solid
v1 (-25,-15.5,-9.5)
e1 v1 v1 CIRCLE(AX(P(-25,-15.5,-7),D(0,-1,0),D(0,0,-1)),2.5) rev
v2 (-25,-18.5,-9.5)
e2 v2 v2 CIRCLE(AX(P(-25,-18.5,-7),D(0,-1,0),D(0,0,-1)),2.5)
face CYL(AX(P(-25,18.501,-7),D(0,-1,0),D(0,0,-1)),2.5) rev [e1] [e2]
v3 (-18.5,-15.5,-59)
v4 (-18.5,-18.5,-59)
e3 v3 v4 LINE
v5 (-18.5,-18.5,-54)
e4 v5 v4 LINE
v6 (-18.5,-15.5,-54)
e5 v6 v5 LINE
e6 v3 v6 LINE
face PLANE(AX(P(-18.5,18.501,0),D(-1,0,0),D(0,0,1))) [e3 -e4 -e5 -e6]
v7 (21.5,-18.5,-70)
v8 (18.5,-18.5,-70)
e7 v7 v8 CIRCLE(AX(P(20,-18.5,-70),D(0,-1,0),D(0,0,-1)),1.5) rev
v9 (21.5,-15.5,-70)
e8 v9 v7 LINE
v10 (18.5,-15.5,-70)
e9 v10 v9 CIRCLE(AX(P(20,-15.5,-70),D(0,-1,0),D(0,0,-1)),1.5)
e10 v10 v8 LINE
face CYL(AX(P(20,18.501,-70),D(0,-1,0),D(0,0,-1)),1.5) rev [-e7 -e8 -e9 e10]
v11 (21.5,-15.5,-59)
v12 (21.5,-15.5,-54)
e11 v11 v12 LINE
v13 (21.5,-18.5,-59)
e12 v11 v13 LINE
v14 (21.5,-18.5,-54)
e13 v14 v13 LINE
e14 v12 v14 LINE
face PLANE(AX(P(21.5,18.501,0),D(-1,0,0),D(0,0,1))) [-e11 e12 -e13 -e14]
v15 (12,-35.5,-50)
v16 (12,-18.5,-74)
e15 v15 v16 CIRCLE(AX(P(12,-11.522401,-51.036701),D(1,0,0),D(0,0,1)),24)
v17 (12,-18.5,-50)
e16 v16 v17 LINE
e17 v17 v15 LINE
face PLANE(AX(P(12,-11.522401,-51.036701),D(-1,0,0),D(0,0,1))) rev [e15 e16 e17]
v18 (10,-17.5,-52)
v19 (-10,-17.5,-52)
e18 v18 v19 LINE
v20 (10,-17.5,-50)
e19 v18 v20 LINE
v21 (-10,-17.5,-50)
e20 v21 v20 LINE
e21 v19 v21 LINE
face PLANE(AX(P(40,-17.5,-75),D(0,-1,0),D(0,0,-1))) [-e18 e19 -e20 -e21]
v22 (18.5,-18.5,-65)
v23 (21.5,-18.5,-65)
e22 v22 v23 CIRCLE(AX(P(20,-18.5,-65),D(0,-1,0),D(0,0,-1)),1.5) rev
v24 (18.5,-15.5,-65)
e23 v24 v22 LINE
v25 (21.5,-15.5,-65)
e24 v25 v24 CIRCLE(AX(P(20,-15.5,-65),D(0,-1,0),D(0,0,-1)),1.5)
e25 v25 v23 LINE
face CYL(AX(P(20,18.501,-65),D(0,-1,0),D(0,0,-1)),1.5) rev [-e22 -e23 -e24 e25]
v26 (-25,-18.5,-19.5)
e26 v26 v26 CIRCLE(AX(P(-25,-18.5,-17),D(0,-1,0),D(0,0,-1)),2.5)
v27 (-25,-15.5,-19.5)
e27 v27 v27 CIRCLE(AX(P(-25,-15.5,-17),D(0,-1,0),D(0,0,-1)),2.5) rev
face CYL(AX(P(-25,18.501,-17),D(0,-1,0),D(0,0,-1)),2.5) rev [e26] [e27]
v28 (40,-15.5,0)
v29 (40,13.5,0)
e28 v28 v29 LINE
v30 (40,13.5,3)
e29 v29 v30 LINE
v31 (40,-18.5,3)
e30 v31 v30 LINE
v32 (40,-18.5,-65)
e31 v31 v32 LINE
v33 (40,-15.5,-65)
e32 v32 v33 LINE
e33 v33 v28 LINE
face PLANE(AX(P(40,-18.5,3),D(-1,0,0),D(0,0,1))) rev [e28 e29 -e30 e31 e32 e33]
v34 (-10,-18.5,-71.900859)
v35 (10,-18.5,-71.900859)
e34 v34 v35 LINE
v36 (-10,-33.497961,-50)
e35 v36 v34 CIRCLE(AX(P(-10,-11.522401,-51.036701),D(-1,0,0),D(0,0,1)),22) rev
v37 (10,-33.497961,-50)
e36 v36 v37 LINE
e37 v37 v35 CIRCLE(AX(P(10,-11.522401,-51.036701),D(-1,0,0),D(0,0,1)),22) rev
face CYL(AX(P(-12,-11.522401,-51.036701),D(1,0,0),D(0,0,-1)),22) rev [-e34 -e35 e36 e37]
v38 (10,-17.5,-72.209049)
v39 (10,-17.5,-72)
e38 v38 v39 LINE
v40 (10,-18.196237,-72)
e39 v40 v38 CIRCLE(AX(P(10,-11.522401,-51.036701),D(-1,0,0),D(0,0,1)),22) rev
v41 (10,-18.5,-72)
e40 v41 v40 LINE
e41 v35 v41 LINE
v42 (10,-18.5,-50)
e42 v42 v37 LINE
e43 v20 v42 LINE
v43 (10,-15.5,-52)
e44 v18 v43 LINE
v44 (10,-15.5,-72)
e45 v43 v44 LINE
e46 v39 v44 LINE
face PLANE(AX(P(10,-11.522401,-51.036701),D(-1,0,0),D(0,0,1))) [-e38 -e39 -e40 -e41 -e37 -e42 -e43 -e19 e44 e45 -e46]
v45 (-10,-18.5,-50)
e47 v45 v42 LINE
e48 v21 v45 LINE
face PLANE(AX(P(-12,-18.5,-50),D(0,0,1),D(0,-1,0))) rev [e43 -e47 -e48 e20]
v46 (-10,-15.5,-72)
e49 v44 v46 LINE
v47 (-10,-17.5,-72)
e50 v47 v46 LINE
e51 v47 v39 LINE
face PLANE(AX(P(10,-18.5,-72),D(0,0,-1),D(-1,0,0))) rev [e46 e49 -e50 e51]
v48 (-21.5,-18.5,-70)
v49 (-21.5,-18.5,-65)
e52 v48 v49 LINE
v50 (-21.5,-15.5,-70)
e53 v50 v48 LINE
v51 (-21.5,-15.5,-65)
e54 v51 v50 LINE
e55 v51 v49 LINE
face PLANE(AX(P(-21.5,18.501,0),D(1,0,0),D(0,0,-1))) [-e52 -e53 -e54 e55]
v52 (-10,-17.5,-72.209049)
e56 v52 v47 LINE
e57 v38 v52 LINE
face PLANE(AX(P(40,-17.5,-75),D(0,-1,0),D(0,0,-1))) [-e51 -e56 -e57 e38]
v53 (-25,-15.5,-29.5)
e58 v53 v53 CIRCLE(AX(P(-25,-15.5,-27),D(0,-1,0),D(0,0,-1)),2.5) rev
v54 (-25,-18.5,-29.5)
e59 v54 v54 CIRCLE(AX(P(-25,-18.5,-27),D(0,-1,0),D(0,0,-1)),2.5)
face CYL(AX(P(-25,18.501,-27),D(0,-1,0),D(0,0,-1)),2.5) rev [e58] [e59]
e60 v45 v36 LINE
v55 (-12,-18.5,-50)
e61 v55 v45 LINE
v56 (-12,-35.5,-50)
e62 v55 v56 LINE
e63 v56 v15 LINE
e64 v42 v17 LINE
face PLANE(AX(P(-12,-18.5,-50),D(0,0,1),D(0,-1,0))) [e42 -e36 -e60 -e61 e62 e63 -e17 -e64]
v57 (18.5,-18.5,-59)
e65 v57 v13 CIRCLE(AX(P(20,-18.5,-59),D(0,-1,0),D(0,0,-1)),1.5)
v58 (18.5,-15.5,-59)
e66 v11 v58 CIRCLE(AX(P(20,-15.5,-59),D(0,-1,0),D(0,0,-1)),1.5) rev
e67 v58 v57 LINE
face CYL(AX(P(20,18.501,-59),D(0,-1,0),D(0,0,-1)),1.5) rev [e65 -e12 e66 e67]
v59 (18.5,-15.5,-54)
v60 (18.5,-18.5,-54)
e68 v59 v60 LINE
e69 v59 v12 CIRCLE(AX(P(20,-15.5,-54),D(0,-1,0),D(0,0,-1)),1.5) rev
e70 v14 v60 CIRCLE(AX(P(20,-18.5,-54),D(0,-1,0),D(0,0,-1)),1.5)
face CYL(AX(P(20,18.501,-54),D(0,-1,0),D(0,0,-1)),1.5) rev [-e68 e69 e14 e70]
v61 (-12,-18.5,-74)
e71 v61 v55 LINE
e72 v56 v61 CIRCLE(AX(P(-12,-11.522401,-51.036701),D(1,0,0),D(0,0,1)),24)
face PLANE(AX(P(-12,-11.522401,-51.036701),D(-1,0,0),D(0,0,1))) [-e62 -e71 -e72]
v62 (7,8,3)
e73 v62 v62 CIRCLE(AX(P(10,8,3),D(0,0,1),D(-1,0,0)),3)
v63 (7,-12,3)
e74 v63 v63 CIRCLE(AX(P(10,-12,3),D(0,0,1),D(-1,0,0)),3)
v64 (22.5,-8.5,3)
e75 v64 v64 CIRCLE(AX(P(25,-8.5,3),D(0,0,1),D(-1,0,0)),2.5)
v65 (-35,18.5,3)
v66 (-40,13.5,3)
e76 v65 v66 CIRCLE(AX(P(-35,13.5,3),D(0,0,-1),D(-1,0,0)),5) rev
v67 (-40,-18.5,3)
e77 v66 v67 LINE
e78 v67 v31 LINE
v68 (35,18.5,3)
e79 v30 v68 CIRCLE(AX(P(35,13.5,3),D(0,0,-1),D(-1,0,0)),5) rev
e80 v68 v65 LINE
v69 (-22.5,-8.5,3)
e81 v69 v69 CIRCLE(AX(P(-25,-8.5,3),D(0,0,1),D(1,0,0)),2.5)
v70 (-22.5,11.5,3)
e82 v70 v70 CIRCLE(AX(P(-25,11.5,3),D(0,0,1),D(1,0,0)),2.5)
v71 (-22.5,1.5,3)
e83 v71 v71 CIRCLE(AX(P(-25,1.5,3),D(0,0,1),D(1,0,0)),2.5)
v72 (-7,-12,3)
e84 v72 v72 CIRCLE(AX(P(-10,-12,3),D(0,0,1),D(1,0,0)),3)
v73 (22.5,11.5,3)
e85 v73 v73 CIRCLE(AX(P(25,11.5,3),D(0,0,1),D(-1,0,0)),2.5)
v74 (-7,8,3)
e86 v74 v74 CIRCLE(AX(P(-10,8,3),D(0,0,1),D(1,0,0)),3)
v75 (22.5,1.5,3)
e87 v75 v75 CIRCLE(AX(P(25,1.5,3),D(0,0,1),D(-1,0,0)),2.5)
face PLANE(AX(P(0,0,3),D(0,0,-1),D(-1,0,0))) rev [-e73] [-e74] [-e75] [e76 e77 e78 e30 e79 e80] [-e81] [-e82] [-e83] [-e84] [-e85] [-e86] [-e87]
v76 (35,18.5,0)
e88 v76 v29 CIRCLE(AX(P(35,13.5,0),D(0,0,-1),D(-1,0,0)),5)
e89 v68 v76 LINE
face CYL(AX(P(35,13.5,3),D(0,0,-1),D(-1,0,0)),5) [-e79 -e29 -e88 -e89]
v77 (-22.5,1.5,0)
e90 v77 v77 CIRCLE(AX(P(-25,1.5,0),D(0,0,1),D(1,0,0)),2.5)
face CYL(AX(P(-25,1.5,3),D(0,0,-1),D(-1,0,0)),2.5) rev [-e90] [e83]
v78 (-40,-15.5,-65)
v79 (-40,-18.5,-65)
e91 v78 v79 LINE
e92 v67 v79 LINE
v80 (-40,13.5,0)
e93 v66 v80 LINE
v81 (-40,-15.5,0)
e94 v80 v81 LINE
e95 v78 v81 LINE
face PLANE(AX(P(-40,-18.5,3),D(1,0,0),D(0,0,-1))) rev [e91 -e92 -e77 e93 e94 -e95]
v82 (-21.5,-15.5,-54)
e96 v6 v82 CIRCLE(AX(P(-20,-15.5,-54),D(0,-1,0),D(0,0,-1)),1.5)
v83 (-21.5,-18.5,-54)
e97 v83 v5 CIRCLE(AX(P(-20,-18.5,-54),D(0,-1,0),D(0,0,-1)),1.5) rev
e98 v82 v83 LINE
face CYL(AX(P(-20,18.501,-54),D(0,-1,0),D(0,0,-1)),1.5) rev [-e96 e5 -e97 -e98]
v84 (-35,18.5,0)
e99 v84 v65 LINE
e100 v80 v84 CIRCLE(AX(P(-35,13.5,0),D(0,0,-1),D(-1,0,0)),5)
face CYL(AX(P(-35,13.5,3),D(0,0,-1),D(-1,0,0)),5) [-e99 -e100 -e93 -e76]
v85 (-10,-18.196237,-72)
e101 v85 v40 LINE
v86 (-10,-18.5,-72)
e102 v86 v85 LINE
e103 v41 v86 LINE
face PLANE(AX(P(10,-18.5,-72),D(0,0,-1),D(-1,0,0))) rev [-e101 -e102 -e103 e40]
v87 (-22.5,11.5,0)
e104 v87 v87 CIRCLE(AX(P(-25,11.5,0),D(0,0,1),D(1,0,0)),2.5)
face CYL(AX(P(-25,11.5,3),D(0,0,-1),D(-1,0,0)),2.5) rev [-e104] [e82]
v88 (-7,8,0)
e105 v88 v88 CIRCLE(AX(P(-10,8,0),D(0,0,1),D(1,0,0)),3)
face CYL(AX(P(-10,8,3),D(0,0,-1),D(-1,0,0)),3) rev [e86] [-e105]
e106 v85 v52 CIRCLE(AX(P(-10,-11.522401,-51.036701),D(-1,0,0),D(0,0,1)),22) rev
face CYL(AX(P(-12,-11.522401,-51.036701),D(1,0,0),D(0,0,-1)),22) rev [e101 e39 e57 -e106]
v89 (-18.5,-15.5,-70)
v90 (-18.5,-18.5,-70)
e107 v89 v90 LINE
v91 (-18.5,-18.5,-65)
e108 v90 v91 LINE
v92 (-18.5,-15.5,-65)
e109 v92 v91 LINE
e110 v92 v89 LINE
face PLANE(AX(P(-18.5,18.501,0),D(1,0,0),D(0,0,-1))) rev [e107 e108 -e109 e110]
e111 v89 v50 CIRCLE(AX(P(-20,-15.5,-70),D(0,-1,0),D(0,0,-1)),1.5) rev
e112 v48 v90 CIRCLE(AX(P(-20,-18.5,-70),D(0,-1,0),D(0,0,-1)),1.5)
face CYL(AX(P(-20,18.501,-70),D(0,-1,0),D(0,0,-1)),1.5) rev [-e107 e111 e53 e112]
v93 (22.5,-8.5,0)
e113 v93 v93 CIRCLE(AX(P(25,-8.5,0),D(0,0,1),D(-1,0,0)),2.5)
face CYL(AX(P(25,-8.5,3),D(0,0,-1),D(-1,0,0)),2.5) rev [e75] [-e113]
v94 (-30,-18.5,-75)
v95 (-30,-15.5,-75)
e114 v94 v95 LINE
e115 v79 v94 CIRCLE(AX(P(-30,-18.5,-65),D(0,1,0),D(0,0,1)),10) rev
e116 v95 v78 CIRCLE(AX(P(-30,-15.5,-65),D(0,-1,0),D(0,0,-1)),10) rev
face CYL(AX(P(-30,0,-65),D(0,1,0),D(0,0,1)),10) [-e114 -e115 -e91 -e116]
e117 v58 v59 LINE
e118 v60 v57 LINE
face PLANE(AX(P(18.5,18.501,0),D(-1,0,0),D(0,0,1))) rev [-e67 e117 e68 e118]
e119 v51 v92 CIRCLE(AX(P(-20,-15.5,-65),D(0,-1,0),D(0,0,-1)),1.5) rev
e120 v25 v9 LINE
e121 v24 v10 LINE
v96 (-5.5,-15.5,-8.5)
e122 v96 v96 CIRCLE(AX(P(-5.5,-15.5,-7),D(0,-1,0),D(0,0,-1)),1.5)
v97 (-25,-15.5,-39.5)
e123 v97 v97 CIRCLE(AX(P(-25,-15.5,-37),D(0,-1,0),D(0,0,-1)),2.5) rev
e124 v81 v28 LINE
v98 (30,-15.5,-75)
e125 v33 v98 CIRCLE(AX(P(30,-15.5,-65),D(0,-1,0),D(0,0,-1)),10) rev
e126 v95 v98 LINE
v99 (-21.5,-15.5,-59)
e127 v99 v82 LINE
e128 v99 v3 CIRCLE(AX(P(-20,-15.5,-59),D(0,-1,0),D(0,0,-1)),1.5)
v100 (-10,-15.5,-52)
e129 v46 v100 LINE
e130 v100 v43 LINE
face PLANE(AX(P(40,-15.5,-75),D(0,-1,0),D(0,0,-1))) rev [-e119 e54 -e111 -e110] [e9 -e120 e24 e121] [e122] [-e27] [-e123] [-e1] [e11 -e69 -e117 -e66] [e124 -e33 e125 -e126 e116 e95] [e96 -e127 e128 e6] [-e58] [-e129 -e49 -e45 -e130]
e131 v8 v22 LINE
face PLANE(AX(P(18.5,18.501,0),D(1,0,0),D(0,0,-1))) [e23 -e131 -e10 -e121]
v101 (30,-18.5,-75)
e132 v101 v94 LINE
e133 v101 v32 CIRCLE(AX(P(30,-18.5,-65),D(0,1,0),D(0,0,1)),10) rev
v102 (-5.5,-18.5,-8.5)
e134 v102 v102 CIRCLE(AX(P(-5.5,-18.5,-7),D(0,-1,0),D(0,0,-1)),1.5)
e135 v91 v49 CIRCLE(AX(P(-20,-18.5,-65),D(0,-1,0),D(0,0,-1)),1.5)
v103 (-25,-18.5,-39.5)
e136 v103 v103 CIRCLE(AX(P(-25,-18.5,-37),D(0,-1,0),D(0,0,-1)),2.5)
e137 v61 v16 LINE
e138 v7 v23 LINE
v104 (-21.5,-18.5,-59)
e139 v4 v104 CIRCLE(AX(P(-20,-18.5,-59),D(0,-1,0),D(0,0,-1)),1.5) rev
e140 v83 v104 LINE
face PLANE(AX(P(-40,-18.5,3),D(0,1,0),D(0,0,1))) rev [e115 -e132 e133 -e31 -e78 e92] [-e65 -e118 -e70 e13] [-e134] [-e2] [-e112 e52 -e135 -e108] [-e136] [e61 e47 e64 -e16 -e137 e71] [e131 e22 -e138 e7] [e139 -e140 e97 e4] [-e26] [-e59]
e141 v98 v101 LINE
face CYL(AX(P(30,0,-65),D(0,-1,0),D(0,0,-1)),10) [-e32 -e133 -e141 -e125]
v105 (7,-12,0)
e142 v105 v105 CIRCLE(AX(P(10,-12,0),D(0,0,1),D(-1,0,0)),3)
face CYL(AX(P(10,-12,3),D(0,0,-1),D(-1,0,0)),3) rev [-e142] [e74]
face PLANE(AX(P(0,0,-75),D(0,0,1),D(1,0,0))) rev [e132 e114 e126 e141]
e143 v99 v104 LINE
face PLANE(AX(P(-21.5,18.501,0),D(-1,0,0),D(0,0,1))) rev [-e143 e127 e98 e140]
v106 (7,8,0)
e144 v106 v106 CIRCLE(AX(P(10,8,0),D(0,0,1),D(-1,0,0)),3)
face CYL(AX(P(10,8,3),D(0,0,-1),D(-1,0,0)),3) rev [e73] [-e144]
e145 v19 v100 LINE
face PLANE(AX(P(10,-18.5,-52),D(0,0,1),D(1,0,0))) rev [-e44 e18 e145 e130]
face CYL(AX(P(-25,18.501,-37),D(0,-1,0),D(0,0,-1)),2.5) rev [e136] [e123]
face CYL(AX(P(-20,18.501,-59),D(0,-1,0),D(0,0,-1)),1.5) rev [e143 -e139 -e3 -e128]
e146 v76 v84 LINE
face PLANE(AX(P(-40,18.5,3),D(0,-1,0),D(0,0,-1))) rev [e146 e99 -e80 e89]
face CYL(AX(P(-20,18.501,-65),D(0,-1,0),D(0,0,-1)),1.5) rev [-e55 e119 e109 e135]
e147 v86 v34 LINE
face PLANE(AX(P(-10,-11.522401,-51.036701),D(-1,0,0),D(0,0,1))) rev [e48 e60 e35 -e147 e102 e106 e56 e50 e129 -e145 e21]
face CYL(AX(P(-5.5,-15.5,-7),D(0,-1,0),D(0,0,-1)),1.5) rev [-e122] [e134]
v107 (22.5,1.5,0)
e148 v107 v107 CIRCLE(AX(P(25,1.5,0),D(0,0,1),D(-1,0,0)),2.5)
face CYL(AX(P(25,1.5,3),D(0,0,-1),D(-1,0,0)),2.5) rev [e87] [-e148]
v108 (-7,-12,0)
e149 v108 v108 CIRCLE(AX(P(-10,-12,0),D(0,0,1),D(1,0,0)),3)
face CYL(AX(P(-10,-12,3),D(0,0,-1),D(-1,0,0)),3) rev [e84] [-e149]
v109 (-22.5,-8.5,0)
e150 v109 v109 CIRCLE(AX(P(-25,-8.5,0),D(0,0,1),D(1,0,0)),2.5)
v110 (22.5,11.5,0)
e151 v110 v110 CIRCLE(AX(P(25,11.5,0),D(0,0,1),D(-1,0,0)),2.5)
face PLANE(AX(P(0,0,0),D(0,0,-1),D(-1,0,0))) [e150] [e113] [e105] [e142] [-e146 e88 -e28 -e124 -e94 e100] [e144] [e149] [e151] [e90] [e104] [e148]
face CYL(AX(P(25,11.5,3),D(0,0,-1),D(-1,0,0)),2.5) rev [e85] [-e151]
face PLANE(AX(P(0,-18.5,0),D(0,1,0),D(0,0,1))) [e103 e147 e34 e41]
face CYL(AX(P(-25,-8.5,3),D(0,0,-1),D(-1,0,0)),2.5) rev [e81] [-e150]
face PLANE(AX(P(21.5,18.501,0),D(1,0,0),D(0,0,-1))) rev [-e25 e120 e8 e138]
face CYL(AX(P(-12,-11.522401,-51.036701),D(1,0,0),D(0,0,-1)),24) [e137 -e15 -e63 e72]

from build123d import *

# Parameters (mm, degrees)
SZKIC2_W                    = 80
SZKIC2_H                    = 37
SZKIC2_R                    = 3
SZKIC2_R_2                  = 2.5
DODANIE_WYCI_GNI_CIE1_DEPTH = 3
ZAOKR_GLENIE1_R             = 5
SZKIC3_W                    = 80
SZKIC3_H                    = 3
DODANIE_WYCI_GNI_CIE2_DEPTH = 75
WYTNIJ_WYCI_GNI_CIE1_REACH  = 94.704
DODANIE_WYCI_GNI_CIE3_DEPTH = 24
SKORUPA8_START              = -10
SKORUPA8_DEPTH              = 20
SZKIC10_W                   = 20
SZKIC10_H                   = 20
WYTNIJ_WYCI_GNI_CIE5_DEPTH  = 3
SZKIC4_5_R                  = 1.5
WYTNIJ_WYCI_GNI_CIE7_DEPTH  = 3
ZAOKR_GLENIE2_R             = 10
WYTNIJ_WYCI_GNI_CIE8_REACH  = 94.704
SZKIC11_R                   = 2.5


# Read off the part's stored shape, not the designer's step: Skorupa8
with BuildPart() as part:
    # Szkic2 → Dodanie-wyciągnięcie1 (new body)
    with BuildSketch(Plane.XY):
        Rectangle(SZKIC2_W, SZKIC2_H)
        with Locations((-10, -12)):
            Circle(SZKIC2_R, mode=Mode.SUBTRACT)
        with Locations((-25, -8.5)):
            Circle(SZKIC2_R_2, mode=Mode.SUBTRACT)
        with Locations((-25, 1.5)):
            Circle(SZKIC2_R_2, mode=Mode.SUBTRACT)
        with Locations((-25, 11.5)):
            Circle(SZKIC2_R_2, mode=Mode.SUBTRACT)
        with Locations(Location((10, -12, 0), (0, 0, 180))):
            Circle(SZKIC2_R, mode=Mode.SUBTRACT)
        with Locations(Location((25, -8.5, 0), (0, 0, 180))):
            Circle(SZKIC2_R_2, mode=Mode.SUBTRACT)
        with Locations(Location((25, 1.5, 0), (0, 0, 180))):
            Circle(SZKIC2_R_2, mode=Mode.SUBTRACT)
        with Locations(Location((25, 11.5, 0), (0, 0, 180))):
            Circle(SZKIC2_R_2, mode=Mode.SUBTRACT)
        with Locations((-10, 8)):
            Circle(SZKIC2_R, mode=Mode.SUBTRACT)
        with Locations(Location((10, 8, 0), (0, 0, 180))):
            Circle(SZKIC2_R, mode=Mode.SUBTRACT)
    extrude(amount=DODANIE_WYCI_GNI_CIE1_DEPTH)

    # Zaokrąglenie1
    zaokr_glenie1_edges = [part.edges().sort_by_distance(p)[0] for p in [
        (-40, 18.5, 1.5),
        (40, 18.5, 1.5),
    ]]
    fillet(zaokr_glenie1_edges, radius=ZAOKR_GLENIE1_R)

    # Szkic3 → Dodanie-wyciągnięcie2 (add)
    with BuildSketch(Plane(origin=(0, 0, 0), x_dir=(-1, 0, 0), z_dir=(0, 0, -1))):
        with Locations((0, -17)):
            Rectangle(SZKIC3_W, SZKIC3_H)
    extrude(amount=DODANIE_WYCI_GNI_CIE2_DEPTH)

    # Szkic4 → Wytnij-wyciągnięcie1 (cut, up to next)
    with BuildSketch(Plane.XZ.offset(18.5), mode=Mode.PRIVATE) as wytnij_wyci_gni_cie1_sk1:
        with BuildLine():
            Line((-21.5, -65), (-21.5, -70))
            ThreePointArc((-21.5, -70), (-20, -71.5), (-18.5, -70))
            Line((-18.5, -70), (-18.5, -65))
            ThreePointArc((-18.5, -65), (-20, -63.5), (-21.5, -65))
        make_face()
    wytnij_wyci_gni_cie1_tool1 = extrude(wytnij_wyci_gni_cie1_sk1.sketch, amount=-WYTNIJ_WYCI_GNI_CIE1_REACH, mode=Mode.PRIVATE) & part.part
    # Szkic4 → Wytnij-wyciągnięcie1 (cut, up to next)
    with BuildSketch(Plane.XZ.offset(18.5), mode=Mode.PRIVATE) as wytnij_wyci_gni_cie1_sk2:
        with BuildLine():
            ThreePointArc((-18.5, -54), (-20, -52.5), (-21.5, -54))
            Line((-21.5, -54), (-21.5, -59))
            ThreePointArc((-21.5, -59), (-20, -60.5), (-18.5, -59))
            Line((-18.5, -59), (-18.5, -54))
        make_face()
    wytnij_wyci_gni_cie1_tool2 = extrude(wytnij_wyci_gni_cie1_sk2.sketch, amount=-WYTNIJ_WYCI_GNI_CIE1_REACH, mode=Mode.PRIVATE) & part.part
    # Szkic4 → Wytnij-wyciągnięcie1 (cut, up to next)
    with BuildSketch(Plane.XZ.offset(18.5), mode=Mode.PRIVATE) as wytnij_wyci_gni_cie1_sk3:
        with BuildLine():
            ThreePointArc((21.5, -54), (20, -52.5), (18.5, -54))
            Line((18.5, -54), (18.5, -59))
            ThreePointArc((18.5, -59), (20, -60.5), (21.5, -59))
            Line((21.5, -59), (21.5, -54))
        make_face()
    wytnij_wyci_gni_cie1_tool3 = extrude(wytnij_wyci_gni_cie1_sk3.sketch, amount=-WYTNIJ_WYCI_GNI_CIE1_REACH, mode=Mode.PRIVATE) & part.part
    # Szkic4 → Wytnij-wyciągnięcie1 (cut, up to next)
    with BuildSketch(Plane.XZ.offset(18.5), mode=Mode.PRIVATE) as wytnij_wyci_gni_cie1_sk4:
        with BuildLine():
            Line((18.5, -65), (18.5, -70))
            ThreePointArc((18.5, -70), (20, -71.5), (21.5, -70))
            Line((21.5, -70), (21.5, -65))
            ThreePointArc((21.5, -65), (20, -63.5), (18.5, -65))
        make_face()
    wytnij_wyci_gni_cie1_tool4 = extrude(wytnij_wyci_gni_cie1_sk4.sketch, amount=-WYTNIJ_WYCI_GNI_CIE1_REACH, mode=Mode.PRIVATE) & part.part
    add(wytnij_wyci_gni_cie1_tool1.solids().sort_by_distance((-20, -18.5, -67.5))[0], mode=Mode.SUBTRACT)
    add(wytnij_wyci_gni_cie1_tool2.solids().sort_by_distance((-20, -18.5, -56.5))[0], mode=Mode.SUBTRACT)
    add(wytnij_wyci_gni_cie1_tool3.solids().sort_by_distance((20, -18.5, -56.5))[0], mode=Mode.SUBTRACT)
    add(wytnij_wyci_gni_cie1_tool4.solids().sort_by_distance((20, -18.5, -67.5))[0], mode=Mode.SUBTRACT)

    # Szkic8 → Dodanie-wyciągnięcie3 (add)
    with BuildSketch(Plane(origin=(12, 0, 0), x_dir=(0, 0, -1), z_dir=(1, 0, 0))):
        with BuildLine():
            Line((50, -18.5), (50, -35.5))
            ThreePointArc((50, -35.5), (64.90911692, -31.106988593), (74, -18.5))
            Line((74, -18.5), (50, -18.5))
        make_face()
    extrude(amount=-DODANIE_WYCI_GNI_CIE3_DEPTH)

    # Skorupa8 outline → Skorupa8 (cut)
    with BuildSketch(Plane.YZ.offset(SKORUPA8_START)):
        with BuildLine():
            Line((-17.5, -72.209048527), (-17.5, -50))
            Line((-17.5, -50), (-33.497961371, -50))
            ThreePointArc((-33.497961371, -50), (-29.37331804, -63.895346178), (-17.5, -72.209048527))
        make_face()
    extrude(amount=SKORUPA8_DEPTH, mode=Mode.SUBTRACT)

    # Szkic10 → Wytnij-wyciągnięcie5 (cut)
    with BuildSketch(Plane(origin=(0, -15.5, 0), x_dir=(1, 0, 0), z_dir=(0, 1, 0))):
        with Locations((0, 62)):
            Rectangle(SZKIC10_W, SZKIC10_H)
    extrude(amount=-WYTNIJ_WYCI_GNI_CIE5_DEPTH, mode=Mode.SUBTRACT)

    # Szkic4<5> → Wytnij-wyciągnięcie7 (cut)
    with BuildSketch(Plane.XZ.offset(18.5)):
        with Locations(Location((-5.5, -7, 0), (0, 0, 270))):
            Circle(SZKIC4_5_R)
    extrude(amount=-WYTNIJ_WYCI_GNI_CIE7_DEPTH, mode=Mode.SUBTRACT)

    # Zaokrąglenie2
    zaokr_glenie2_edges = [part.edges().sort_by_distance(p)[0] for p in [
        (40, -17, -75),
        (-40, -17, -75),
    ]]
    fillet(zaokr_glenie2_edges, radius=ZAOKR_GLENIE2_R)

    # Szkic11 → Wytnij-wyciągnięcie8 (cut, up to next)
    with BuildSketch(Plane.XZ.offset(18.5), mode=Mode.PRIVATE) as wytnij_wyci_gni_cie8_sk1:
        with Locations(Location((-25, -7, 0), (0, 0, 270))):
            Circle(SZKIC11_R)
    wytnij_wyci_gni_cie8_tool1 = extrude(wytnij_wyci_gni_cie8_sk1.sketch, amount=-WYTNIJ_WYCI_GNI_CIE8_REACH, mode=Mode.PRIVATE) & part.part
    # Szkic11 → Wytnij-wyciągnięcie8 (cut, up to next)
    with BuildSketch(Plane.XZ.offset(18.5), mode=Mode.PRIVATE) as wytnij_wyci_gni_cie8_sk2:
        with Locations(Location((-25, -17, 0), (0, 0, 270))):
            Circle(SZKIC11_R)
    wytnij_wyci_gni_cie8_tool2 = extrude(wytnij_wyci_gni_cie8_sk2.sketch, amount=-WYTNIJ_WYCI_GNI_CIE8_REACH, mode=Mode.PRIVATE) & part.part
    # Szkic11 → Wytnij-wyciągnięcie8 (cut, up to next)
    with BuildSketch(Plane.XZ.offset(18.5), mode=Mode.PRIVATE) as wytnij_wyci_gni_cie8_sk3:
        with Locations(Location((-25, -27, 0), (0, 0, 270))):
            Circle(SZKIC11_R)
    wytnij_wyci_gni_cie8_tool3 = extrude(wytnij_wyci_gni_cie8_sk3.sketch, amount=-WYTNIJ_WYCI_GNI_CIE8_REACH, mode=Mode.PRIVATE) & part.part
    # Szkic11 → Wytnij-wyciągnięcie8 (cut, up to next)
    with BuildSketch(Plane.XZ.offset(18.5), mode=Mode.PRIVATE) as wytnij_wyci_gni_cie8_sk4:
        with Locations(Location((-25, -37, 0), (0, 0, 270))):
            Circle(SZKIC11_R)
    wytnij_wyci_gni_cie8_tool4 = extrude(wytnij_wyci_gni_cie8_sk4.sketch, amount=-WYTNIJ_WYCI_GNI_CIE8_REACH, mode=Mode.PRIVATE) & part.part
    add(wytnij_wyci_gni_cie8_tool1.solids().sort_by_distance((-25, -18.5, -7))[0], mode=Mode.SUBTRACT)
    add(wytnij_wyci_gni_cie8_tool2.solids().sort_by_distance((-25, -18.5, -17))[0], mode=Mode.SUBTRACT)
    add(wytnij_wyci_gni_cie8_tool3.solids().sort_by_distance((-25, -18.5, -27))[0], mode=Mode.SUBTRACT)
    add(wytnij_wyci_gni_cie8_tool4.solids().sort_by_distance((-25, -18.5, -37))[0], mode=Mode.SUBTRACT)


solid = part.part
